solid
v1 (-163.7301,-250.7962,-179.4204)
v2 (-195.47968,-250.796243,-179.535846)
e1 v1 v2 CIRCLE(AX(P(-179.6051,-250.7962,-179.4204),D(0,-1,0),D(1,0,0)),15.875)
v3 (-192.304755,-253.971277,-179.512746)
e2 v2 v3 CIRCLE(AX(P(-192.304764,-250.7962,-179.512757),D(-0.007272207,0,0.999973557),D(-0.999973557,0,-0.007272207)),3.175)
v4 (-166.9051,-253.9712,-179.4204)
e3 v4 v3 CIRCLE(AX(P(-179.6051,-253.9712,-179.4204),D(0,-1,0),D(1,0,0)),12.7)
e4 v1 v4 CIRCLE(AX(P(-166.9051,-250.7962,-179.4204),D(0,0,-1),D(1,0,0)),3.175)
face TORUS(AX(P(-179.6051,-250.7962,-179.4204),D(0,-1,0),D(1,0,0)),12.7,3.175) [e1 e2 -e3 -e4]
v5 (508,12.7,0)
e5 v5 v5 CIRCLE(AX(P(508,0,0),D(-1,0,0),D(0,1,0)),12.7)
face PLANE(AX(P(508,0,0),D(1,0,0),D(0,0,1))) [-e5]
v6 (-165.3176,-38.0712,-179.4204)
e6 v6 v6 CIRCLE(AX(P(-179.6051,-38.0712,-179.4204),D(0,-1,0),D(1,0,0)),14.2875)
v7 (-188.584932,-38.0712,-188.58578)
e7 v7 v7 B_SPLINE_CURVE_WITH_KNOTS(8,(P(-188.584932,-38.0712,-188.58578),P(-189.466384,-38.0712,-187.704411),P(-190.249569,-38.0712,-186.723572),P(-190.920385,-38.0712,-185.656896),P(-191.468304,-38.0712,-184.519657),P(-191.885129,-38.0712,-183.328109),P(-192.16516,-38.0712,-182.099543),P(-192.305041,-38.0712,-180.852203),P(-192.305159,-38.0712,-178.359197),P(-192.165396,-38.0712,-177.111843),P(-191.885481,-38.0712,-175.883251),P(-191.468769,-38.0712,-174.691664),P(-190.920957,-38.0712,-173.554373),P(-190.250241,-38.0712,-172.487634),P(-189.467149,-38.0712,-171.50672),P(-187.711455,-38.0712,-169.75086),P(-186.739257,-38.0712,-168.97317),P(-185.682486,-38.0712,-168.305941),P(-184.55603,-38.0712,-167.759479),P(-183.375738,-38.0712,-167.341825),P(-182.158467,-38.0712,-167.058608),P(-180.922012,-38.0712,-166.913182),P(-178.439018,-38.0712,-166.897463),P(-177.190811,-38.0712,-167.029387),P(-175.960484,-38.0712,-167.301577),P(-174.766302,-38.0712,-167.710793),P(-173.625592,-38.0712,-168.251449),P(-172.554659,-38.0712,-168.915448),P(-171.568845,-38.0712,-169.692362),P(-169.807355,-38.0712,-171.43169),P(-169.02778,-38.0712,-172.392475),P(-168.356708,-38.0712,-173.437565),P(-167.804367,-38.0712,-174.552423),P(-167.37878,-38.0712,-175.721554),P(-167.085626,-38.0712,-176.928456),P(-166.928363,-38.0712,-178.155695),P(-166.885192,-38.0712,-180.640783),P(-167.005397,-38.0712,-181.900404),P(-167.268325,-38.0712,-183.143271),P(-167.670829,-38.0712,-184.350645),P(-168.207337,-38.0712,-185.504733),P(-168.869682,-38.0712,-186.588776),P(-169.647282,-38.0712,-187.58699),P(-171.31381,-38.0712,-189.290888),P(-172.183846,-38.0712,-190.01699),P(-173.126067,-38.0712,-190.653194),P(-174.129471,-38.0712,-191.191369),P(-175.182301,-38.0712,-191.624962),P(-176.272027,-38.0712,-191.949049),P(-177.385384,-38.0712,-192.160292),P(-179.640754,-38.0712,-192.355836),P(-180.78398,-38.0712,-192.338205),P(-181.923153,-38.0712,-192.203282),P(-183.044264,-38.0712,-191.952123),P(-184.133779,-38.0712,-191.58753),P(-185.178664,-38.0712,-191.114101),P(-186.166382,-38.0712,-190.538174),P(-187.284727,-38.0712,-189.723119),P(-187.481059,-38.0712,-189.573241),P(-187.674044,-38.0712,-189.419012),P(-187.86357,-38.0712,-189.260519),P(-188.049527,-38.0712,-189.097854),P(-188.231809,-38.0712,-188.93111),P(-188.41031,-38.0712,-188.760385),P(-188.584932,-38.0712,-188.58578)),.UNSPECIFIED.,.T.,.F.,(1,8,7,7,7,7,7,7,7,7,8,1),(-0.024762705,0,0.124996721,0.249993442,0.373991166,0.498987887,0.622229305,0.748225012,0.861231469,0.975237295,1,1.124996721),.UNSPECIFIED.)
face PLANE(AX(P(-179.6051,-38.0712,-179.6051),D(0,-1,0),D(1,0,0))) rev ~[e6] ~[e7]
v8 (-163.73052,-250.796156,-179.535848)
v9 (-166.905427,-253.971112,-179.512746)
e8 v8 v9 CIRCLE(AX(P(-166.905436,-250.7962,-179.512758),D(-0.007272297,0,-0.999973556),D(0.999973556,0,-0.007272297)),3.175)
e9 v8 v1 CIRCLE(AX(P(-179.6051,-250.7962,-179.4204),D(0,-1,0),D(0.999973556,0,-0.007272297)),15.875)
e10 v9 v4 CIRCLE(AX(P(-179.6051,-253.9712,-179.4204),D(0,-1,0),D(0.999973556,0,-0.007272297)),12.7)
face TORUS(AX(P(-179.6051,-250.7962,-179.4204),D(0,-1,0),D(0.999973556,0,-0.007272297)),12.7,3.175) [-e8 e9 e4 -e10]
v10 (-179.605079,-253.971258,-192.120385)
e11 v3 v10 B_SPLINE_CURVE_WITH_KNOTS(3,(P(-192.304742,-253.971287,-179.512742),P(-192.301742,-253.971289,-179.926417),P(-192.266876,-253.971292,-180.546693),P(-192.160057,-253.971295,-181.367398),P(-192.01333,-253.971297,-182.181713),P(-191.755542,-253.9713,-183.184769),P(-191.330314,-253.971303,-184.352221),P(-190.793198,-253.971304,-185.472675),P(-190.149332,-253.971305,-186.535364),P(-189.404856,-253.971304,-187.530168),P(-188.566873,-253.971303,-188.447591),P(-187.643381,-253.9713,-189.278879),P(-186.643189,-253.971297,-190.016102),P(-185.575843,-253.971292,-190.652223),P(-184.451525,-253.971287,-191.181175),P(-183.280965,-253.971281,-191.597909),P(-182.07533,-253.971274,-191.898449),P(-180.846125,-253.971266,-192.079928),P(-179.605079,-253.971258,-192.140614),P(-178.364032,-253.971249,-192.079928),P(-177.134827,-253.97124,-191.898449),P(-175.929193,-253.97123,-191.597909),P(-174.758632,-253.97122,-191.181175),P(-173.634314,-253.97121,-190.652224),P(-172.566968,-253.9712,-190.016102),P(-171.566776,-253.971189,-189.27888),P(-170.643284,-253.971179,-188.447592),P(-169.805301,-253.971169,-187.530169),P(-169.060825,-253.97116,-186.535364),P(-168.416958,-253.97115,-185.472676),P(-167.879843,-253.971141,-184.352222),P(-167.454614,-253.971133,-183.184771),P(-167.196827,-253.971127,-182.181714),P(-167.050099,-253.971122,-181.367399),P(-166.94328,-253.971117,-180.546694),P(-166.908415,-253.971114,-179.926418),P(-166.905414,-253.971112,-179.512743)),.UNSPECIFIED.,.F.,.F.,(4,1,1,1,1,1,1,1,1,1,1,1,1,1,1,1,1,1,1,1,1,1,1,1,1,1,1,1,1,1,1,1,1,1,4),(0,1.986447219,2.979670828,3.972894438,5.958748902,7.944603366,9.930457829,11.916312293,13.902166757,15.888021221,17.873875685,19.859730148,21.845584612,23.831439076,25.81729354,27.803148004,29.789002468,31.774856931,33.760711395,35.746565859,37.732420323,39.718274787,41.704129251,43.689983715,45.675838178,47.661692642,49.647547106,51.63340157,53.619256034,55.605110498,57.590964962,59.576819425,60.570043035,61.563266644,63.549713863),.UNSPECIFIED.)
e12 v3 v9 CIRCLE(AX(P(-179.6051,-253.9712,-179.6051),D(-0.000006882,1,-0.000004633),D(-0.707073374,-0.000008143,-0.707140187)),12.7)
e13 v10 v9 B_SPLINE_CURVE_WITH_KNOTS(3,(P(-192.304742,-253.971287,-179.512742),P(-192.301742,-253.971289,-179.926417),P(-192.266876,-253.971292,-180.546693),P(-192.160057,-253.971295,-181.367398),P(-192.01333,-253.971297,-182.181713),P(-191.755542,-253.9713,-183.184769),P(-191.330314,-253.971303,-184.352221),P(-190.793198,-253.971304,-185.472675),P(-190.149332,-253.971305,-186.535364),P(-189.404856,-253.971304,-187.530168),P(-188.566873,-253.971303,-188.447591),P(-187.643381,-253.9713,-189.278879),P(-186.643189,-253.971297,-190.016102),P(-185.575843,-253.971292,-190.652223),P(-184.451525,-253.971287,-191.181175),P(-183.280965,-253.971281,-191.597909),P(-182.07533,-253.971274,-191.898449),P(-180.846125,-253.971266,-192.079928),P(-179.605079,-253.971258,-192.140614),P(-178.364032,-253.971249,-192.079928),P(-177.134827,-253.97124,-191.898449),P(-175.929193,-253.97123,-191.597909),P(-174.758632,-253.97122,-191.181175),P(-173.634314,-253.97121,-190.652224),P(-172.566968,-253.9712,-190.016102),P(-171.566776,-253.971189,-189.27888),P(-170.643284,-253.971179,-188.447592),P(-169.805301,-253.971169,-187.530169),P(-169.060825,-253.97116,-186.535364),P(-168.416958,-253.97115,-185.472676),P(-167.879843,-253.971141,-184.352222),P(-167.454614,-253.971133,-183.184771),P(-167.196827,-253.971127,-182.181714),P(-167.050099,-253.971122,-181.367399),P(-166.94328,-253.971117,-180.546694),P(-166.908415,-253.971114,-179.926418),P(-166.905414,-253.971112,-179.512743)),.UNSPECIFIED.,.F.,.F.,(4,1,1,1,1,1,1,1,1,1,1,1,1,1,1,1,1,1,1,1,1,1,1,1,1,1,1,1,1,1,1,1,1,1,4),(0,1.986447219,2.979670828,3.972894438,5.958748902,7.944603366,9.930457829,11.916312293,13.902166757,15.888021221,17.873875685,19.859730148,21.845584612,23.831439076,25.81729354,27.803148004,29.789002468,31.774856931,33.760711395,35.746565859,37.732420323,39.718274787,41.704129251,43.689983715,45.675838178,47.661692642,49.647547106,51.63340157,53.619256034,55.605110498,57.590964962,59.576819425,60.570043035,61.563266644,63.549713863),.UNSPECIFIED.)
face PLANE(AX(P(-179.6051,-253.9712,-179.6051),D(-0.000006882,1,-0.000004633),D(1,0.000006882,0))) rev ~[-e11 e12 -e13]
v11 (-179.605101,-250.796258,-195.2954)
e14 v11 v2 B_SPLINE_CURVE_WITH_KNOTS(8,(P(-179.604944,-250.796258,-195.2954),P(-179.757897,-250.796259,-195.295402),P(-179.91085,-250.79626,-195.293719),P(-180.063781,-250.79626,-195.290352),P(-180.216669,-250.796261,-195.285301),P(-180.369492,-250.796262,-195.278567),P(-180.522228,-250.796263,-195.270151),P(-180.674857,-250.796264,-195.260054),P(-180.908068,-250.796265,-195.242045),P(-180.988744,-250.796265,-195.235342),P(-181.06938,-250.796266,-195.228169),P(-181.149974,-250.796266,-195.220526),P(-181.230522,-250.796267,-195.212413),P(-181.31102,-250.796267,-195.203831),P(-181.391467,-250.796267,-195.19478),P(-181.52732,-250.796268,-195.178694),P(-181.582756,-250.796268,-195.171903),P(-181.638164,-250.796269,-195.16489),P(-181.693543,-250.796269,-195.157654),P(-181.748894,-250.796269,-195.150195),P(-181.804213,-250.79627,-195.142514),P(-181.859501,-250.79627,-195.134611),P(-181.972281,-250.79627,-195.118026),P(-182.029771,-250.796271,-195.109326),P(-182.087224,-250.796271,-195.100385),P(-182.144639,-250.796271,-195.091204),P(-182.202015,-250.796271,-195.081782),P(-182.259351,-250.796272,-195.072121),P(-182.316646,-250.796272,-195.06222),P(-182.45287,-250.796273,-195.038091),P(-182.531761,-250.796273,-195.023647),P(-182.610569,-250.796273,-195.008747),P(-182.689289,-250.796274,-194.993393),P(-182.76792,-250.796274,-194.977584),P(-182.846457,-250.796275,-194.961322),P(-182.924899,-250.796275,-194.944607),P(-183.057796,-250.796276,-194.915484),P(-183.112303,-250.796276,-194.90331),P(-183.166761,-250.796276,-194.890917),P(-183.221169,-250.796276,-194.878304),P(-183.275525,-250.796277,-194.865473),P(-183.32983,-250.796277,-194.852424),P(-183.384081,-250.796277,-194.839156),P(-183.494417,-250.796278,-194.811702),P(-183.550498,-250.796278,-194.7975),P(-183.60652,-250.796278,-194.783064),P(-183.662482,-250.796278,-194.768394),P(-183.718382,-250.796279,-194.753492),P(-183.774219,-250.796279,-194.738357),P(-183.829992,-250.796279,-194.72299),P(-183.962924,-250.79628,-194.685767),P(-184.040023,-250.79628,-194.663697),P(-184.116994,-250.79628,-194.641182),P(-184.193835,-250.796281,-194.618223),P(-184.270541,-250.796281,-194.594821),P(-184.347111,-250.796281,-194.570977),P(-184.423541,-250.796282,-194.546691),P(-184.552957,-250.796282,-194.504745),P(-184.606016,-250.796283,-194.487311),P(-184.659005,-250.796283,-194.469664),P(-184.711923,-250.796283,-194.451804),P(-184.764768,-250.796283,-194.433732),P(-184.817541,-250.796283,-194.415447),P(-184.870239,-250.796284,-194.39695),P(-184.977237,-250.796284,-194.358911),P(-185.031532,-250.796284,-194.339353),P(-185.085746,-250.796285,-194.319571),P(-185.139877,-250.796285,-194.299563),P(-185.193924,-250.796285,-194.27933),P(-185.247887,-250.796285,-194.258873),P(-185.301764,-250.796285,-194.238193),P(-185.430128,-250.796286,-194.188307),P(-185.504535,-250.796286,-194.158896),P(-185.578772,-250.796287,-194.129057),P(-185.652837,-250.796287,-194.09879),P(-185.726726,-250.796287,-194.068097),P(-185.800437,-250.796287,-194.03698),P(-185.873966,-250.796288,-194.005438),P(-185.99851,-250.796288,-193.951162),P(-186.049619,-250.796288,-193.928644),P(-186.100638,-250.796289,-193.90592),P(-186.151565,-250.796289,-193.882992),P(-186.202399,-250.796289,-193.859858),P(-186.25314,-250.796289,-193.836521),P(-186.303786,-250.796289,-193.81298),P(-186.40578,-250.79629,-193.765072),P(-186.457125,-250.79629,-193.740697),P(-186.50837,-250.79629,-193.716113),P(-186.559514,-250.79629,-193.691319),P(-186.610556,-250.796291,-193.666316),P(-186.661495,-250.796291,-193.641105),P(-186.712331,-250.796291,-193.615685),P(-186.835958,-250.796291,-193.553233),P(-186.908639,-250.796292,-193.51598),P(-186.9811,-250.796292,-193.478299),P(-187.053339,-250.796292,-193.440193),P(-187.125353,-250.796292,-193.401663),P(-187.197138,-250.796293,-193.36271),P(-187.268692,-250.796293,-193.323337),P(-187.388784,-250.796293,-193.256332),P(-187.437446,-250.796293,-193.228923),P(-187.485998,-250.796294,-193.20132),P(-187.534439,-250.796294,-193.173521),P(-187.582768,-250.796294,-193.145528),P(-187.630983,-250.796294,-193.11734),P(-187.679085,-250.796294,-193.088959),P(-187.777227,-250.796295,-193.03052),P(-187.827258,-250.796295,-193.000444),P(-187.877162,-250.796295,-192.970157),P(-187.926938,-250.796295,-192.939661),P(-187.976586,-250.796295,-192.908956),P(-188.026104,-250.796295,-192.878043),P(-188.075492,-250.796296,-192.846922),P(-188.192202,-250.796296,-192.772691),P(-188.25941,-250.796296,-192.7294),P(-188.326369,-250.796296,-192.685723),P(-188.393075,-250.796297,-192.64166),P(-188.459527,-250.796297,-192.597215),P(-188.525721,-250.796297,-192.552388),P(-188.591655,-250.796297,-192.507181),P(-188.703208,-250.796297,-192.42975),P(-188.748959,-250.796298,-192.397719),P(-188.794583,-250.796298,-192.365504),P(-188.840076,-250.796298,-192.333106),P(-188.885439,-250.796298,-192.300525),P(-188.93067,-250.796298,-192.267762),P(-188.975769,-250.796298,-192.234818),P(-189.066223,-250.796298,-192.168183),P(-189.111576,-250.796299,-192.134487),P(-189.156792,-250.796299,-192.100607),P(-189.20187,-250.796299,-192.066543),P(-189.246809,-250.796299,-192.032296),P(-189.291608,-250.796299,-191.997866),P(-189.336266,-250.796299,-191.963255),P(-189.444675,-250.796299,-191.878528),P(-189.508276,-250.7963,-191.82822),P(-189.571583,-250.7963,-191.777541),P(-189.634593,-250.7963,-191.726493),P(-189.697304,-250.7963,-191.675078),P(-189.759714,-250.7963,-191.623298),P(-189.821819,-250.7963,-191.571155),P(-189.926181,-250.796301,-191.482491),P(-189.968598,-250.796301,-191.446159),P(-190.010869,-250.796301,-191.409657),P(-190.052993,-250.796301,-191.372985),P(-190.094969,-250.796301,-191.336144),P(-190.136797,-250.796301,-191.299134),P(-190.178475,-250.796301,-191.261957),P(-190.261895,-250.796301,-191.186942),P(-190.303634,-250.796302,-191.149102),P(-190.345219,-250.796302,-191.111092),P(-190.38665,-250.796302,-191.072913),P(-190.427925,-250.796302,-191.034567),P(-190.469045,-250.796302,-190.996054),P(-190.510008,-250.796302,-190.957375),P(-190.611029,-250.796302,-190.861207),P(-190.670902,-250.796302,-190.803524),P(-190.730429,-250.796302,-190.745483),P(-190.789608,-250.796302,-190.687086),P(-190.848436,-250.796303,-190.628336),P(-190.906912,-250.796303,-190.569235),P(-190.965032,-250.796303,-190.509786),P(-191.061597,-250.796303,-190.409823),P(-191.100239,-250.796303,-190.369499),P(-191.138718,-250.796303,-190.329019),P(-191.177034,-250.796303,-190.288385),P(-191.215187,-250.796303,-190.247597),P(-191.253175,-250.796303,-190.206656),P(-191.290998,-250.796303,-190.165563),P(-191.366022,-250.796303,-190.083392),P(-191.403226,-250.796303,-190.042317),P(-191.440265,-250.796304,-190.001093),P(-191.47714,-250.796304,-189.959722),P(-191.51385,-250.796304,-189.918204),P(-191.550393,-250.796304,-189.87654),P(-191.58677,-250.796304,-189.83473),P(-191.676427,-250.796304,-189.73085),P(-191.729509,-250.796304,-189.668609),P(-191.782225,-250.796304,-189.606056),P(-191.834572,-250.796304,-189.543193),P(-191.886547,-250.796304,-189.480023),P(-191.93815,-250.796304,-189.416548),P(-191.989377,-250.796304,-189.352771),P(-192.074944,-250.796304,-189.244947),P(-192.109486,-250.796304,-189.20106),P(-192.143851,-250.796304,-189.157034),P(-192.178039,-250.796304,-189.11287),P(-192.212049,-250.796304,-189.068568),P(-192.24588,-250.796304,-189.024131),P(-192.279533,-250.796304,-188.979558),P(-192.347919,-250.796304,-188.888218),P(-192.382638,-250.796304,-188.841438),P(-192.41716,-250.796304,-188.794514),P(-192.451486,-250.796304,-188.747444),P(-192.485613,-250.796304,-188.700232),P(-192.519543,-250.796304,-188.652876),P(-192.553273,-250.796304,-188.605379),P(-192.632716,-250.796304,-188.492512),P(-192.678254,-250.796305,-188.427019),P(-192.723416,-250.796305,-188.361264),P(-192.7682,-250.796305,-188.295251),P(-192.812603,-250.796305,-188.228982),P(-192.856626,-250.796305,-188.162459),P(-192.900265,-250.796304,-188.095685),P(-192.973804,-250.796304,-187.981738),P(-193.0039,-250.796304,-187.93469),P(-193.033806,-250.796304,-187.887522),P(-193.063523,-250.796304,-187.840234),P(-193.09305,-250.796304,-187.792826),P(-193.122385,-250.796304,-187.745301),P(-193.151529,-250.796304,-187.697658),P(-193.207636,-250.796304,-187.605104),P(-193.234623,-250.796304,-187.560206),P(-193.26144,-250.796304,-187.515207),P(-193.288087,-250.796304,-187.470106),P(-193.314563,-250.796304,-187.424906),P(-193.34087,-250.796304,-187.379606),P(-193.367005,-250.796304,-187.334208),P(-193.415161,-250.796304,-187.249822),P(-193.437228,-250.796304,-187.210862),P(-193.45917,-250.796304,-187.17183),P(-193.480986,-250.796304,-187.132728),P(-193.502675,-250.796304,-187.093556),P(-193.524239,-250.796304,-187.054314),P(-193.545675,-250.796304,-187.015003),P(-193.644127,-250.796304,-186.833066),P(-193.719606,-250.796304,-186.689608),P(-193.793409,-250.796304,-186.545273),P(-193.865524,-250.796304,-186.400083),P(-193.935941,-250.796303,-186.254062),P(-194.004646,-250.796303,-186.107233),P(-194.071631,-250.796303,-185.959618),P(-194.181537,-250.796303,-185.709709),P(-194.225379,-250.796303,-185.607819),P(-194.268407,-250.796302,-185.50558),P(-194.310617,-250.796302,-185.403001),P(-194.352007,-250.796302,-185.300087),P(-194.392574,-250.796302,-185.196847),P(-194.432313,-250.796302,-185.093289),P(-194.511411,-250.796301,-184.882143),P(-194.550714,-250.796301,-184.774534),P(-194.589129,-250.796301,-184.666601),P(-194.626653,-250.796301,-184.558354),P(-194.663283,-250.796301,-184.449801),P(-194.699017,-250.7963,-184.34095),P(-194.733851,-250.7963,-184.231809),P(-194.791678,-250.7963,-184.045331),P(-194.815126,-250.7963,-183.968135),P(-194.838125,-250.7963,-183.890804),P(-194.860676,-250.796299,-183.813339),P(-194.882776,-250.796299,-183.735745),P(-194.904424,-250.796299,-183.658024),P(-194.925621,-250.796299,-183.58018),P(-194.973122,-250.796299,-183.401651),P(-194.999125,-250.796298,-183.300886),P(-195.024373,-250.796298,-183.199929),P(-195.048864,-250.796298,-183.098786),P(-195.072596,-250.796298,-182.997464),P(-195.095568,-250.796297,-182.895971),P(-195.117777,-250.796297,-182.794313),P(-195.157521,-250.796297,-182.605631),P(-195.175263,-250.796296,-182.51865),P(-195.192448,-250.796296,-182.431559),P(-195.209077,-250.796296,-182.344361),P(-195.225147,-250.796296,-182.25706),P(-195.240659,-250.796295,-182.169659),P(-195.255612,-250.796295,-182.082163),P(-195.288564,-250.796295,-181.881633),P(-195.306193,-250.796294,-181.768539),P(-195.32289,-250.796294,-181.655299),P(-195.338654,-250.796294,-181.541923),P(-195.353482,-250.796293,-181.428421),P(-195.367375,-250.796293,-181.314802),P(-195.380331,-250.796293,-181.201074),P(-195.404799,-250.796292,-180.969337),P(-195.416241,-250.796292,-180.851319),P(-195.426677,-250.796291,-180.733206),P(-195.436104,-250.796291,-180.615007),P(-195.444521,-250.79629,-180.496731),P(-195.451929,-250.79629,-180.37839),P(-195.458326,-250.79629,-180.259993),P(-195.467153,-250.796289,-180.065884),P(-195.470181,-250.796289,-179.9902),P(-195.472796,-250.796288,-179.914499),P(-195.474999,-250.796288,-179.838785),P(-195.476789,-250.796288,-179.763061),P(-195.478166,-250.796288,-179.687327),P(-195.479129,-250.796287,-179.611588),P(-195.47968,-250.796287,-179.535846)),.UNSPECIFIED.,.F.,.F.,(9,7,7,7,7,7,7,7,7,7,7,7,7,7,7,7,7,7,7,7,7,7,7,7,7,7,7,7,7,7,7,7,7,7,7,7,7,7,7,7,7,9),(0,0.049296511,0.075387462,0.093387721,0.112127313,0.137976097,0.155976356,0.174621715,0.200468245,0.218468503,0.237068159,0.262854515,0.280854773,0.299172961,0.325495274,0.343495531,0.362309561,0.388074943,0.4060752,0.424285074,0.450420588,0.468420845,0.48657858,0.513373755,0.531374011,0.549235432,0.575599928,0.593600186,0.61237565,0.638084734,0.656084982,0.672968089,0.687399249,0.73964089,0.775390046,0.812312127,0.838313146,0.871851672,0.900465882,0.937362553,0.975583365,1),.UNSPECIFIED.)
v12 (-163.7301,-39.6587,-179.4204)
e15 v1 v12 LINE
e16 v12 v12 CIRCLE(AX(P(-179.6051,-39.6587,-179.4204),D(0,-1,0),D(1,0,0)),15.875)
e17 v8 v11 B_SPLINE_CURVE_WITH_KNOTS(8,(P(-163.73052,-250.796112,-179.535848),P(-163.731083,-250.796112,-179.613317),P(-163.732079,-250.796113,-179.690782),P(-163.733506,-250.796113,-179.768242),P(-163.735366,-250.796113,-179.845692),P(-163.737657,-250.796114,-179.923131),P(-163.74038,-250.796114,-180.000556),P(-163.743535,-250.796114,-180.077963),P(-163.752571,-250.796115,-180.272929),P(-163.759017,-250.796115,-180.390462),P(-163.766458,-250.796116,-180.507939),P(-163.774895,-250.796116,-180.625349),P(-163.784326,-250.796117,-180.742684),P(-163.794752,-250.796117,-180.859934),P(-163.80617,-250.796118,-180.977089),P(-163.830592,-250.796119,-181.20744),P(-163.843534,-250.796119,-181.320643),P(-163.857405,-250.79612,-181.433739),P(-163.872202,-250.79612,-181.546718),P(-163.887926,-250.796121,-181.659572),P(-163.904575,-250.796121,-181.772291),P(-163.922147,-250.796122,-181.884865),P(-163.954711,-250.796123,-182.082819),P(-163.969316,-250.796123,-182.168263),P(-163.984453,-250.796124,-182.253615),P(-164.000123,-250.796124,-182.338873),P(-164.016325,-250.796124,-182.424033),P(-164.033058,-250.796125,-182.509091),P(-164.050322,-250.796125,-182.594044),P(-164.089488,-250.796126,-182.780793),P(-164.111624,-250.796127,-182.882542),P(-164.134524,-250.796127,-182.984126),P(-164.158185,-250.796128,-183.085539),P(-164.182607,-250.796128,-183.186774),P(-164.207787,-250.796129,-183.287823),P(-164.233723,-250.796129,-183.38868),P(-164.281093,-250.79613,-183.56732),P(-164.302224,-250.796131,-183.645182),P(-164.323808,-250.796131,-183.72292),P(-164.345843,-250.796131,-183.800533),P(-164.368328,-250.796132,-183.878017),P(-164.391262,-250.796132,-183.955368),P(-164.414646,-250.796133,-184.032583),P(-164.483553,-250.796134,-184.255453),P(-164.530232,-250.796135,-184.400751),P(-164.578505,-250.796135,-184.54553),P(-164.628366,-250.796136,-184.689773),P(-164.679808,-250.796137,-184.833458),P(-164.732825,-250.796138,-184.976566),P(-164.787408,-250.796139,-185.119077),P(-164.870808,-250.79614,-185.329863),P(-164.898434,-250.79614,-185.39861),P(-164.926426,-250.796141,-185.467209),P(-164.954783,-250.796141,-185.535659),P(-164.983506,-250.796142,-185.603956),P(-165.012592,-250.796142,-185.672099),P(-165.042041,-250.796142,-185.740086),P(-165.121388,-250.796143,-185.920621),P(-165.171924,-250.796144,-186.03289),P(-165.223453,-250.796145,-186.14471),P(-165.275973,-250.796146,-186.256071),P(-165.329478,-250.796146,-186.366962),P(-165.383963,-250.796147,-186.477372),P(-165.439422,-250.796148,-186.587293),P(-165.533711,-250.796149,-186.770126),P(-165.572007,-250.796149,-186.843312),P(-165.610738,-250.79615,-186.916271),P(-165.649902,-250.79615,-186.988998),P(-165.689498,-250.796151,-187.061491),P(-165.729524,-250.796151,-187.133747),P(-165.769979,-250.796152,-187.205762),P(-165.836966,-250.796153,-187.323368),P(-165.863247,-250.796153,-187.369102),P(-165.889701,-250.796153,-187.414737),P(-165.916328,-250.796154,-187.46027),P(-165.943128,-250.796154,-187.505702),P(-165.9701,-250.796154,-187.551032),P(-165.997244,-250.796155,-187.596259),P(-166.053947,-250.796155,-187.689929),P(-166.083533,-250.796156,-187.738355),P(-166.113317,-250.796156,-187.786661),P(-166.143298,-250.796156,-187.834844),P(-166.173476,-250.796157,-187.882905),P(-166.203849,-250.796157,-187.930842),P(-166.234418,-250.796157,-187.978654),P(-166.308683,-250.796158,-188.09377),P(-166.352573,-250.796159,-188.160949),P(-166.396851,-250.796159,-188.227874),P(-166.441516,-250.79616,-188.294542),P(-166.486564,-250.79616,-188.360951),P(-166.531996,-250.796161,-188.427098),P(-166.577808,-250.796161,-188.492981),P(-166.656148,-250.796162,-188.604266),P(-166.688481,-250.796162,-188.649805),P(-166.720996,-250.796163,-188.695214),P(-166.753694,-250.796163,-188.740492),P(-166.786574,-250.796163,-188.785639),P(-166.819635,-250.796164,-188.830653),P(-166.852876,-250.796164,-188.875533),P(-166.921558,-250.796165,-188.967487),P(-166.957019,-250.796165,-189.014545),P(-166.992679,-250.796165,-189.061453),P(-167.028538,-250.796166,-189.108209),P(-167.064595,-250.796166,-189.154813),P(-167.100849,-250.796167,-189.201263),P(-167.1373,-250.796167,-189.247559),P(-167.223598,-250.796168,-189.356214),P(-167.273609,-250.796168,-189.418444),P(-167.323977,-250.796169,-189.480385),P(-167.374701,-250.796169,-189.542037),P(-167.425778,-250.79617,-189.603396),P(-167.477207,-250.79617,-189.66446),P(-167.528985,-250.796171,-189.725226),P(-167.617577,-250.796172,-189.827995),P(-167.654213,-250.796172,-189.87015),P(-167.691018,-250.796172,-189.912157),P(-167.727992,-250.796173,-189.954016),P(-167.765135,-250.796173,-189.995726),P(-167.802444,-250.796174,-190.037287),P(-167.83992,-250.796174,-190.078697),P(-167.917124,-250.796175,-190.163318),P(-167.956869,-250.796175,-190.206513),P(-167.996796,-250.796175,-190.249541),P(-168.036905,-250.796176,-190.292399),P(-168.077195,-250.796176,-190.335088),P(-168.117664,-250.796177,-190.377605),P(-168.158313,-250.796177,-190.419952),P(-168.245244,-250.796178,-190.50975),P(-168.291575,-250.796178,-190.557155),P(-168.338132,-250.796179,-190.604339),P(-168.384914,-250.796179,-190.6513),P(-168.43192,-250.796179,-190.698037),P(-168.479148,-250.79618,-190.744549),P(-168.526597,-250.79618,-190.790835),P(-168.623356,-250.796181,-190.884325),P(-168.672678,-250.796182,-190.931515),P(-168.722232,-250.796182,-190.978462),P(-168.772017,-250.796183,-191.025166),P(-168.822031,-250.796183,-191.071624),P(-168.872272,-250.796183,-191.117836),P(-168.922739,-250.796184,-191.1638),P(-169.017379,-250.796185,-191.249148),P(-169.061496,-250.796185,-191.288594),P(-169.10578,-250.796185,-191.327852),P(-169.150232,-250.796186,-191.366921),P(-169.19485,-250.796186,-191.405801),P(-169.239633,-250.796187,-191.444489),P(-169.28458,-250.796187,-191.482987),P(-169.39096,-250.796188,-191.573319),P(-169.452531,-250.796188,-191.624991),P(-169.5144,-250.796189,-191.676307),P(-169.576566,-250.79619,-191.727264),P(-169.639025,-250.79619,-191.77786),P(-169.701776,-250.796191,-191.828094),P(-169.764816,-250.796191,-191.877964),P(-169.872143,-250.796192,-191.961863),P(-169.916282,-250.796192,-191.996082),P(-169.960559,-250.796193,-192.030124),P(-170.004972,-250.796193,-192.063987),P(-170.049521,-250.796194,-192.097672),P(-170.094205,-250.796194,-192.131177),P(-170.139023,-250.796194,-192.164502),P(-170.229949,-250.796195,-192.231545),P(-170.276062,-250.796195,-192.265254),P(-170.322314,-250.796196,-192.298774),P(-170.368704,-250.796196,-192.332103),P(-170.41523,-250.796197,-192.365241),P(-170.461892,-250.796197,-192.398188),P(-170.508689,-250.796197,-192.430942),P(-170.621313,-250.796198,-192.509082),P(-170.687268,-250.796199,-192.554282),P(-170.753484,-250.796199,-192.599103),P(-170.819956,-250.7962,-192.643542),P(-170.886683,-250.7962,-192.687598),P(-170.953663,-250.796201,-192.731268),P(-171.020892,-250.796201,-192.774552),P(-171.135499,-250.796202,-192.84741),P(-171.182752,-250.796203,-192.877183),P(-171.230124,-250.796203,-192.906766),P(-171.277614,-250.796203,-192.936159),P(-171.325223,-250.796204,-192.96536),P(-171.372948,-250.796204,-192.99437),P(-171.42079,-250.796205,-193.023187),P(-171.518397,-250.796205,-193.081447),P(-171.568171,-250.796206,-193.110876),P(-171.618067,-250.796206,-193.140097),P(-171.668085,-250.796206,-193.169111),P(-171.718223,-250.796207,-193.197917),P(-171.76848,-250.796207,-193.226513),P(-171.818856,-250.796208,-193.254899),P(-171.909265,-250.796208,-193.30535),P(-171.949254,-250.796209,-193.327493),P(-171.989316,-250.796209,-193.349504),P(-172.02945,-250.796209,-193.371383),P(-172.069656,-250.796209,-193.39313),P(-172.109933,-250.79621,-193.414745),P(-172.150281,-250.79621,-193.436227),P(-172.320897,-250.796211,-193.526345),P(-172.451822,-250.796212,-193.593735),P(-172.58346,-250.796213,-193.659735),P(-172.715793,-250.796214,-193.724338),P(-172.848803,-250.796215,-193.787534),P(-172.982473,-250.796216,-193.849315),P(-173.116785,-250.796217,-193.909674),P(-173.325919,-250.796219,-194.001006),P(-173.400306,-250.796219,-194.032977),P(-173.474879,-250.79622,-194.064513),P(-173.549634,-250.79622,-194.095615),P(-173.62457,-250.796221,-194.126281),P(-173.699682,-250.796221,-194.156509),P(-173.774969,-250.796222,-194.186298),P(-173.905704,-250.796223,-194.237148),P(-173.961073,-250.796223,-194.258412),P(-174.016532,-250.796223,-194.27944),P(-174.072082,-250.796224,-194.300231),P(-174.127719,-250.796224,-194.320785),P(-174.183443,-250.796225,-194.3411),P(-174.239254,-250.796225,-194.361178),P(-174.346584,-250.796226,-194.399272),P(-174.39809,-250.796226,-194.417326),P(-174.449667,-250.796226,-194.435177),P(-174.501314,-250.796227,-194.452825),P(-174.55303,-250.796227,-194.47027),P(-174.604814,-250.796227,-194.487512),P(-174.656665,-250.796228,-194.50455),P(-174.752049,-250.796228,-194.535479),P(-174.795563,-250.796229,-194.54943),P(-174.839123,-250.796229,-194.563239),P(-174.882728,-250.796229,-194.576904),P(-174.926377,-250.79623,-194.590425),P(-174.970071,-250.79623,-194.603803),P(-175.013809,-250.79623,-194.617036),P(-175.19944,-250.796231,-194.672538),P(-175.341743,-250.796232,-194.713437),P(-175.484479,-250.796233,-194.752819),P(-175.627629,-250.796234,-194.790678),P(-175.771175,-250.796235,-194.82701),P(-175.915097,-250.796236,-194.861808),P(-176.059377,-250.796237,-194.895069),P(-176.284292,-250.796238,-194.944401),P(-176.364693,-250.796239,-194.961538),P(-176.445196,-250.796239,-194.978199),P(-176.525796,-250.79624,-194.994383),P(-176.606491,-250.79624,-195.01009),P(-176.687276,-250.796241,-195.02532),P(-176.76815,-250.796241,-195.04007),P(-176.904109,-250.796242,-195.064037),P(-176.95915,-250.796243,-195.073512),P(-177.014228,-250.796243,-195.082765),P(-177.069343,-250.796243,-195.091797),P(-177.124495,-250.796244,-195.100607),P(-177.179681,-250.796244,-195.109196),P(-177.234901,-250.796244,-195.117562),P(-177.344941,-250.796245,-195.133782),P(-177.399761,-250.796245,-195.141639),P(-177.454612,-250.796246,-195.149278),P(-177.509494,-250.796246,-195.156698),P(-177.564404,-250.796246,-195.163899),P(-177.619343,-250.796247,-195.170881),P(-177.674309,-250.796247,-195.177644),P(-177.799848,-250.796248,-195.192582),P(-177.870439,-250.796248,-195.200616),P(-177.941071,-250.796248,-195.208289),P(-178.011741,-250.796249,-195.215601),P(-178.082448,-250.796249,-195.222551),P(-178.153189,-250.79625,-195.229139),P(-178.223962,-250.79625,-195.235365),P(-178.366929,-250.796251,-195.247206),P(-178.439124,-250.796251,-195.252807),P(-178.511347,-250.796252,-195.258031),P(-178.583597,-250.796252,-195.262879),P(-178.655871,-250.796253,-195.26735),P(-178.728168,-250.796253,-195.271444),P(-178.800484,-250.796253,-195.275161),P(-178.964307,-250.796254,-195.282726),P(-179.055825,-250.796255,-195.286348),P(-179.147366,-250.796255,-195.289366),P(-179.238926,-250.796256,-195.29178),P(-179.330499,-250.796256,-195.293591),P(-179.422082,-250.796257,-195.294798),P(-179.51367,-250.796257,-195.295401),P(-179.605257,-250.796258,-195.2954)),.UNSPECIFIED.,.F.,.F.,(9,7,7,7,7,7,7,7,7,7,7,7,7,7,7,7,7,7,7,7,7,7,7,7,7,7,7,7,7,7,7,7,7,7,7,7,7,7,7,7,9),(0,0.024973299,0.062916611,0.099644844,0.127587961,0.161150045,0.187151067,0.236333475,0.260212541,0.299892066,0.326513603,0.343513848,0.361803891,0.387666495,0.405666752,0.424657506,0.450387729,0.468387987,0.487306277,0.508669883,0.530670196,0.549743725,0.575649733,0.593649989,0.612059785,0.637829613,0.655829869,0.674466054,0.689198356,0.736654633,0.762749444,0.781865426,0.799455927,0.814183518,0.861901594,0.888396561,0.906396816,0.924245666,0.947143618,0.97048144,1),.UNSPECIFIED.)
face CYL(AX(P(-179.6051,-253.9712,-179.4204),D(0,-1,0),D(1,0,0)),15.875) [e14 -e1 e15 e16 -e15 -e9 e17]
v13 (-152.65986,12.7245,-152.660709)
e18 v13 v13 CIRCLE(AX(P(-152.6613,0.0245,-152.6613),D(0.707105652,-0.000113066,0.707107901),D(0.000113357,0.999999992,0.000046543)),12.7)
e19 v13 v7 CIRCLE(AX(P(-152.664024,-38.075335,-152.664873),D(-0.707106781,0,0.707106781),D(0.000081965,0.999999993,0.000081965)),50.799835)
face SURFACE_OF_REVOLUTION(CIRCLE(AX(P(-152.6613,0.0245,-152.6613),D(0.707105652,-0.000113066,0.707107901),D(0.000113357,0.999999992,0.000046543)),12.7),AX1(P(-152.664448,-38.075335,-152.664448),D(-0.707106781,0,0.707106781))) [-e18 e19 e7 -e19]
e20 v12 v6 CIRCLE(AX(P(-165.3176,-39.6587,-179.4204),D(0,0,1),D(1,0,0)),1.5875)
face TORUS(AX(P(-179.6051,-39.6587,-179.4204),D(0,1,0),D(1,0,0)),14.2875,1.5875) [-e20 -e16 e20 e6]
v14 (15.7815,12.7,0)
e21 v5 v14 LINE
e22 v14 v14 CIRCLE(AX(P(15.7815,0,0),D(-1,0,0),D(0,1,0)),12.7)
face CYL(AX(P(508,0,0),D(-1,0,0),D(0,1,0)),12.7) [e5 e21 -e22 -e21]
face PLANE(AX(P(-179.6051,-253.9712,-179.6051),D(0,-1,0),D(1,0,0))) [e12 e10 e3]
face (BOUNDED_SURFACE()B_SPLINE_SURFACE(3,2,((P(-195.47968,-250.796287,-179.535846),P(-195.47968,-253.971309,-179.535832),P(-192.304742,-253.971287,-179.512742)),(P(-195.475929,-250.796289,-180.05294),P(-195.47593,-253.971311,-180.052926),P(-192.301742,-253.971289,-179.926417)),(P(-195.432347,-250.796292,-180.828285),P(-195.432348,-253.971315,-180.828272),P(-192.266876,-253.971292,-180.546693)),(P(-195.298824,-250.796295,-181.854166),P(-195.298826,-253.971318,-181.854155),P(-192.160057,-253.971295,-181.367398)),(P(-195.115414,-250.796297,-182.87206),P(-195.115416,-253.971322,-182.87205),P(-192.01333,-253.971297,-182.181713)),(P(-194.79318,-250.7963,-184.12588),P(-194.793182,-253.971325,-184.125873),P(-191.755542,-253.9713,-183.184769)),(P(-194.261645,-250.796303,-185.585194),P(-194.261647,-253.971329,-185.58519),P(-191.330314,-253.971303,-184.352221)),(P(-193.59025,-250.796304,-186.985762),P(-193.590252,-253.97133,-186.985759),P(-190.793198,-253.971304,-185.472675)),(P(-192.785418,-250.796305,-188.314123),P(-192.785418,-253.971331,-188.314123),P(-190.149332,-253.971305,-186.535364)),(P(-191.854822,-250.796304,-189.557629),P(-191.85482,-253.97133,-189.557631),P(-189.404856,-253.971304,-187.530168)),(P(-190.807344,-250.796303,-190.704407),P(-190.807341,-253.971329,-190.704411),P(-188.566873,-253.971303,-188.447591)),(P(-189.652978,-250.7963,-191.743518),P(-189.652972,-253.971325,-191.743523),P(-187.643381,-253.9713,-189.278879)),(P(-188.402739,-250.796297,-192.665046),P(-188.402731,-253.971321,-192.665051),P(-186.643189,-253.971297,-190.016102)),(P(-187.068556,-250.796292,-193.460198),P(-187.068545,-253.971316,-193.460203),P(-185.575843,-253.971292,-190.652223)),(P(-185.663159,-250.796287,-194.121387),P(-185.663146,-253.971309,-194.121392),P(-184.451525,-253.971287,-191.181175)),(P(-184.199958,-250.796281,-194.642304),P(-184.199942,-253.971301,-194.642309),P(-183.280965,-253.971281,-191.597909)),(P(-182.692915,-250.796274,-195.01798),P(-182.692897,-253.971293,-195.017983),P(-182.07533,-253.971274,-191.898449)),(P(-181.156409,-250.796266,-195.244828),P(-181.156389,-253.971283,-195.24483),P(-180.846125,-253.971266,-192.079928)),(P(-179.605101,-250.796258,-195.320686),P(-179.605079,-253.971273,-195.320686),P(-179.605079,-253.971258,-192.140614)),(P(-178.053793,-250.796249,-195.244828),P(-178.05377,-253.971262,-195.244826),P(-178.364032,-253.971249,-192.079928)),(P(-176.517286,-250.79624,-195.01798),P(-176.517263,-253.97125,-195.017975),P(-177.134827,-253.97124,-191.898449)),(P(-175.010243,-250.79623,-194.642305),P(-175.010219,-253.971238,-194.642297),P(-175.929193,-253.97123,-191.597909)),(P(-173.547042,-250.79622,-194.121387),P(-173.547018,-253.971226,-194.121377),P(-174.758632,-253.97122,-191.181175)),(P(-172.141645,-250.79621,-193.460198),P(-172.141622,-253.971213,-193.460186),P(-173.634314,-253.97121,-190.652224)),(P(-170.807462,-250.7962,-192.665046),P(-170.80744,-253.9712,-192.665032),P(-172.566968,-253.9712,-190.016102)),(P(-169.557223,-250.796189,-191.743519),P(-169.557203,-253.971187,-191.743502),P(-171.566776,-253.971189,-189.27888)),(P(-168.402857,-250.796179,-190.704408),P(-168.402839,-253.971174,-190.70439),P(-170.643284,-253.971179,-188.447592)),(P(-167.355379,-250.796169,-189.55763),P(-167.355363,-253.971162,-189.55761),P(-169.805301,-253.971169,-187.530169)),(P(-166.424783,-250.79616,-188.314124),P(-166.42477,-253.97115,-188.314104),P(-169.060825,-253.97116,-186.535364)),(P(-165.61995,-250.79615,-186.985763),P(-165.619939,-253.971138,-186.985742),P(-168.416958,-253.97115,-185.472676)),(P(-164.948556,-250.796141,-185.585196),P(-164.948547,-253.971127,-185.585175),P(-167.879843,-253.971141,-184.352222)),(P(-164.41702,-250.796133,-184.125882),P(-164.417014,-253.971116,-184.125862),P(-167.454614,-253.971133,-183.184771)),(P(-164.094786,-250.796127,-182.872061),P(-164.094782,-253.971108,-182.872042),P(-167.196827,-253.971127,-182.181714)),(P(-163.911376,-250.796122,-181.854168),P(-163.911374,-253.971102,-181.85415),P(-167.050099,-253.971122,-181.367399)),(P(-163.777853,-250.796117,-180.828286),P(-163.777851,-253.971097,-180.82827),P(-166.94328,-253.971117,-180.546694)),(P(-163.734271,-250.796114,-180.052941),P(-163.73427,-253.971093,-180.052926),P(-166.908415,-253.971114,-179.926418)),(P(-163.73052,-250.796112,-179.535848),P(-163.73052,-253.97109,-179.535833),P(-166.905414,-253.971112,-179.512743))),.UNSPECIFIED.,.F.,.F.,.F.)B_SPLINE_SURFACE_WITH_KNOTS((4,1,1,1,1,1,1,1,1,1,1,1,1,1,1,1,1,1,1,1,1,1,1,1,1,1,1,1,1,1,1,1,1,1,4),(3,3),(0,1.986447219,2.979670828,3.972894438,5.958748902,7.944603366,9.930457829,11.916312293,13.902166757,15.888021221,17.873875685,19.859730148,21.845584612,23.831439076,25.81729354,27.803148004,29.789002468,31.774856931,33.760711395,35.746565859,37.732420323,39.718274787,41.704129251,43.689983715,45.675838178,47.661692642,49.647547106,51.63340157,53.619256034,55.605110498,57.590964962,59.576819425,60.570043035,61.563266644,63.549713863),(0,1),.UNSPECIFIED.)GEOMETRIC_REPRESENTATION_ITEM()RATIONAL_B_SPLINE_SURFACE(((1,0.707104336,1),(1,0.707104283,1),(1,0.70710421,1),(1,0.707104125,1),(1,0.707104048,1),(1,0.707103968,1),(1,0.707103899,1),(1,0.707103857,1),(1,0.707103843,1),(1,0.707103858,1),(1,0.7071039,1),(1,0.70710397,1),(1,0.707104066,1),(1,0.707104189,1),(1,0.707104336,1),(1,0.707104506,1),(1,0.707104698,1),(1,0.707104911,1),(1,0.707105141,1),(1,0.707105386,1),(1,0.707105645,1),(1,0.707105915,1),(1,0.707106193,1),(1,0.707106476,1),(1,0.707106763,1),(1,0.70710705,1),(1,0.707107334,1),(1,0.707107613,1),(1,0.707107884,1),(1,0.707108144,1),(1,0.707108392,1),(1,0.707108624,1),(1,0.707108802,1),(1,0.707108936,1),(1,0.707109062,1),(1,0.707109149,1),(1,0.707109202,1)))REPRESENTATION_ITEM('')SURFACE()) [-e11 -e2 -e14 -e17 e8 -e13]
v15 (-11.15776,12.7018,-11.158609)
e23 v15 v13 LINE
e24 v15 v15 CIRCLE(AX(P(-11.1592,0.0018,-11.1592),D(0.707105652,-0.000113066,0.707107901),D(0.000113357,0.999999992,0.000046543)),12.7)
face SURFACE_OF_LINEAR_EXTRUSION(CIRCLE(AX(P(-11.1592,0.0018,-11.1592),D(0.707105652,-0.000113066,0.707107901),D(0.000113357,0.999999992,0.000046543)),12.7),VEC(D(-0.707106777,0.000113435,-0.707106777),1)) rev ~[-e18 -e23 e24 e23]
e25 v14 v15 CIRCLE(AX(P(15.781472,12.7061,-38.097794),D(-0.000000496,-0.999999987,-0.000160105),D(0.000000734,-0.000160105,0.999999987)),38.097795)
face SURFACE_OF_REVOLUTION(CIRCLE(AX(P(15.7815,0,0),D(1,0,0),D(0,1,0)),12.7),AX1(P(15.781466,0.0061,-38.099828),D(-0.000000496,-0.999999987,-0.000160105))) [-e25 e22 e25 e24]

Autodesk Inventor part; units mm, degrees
ref_plane "XZ Plane" through (0, 0, 0) normal (0, 1, 0) x (-1, 0, 0)
ref_plane "XY Plane" through (0, 0, 0) normal (0, 0, 1) x (1, 0, 0)
ref_plane "Work Plane1" through (508, 0, 0) normal (1, 0, 0) x (0, 1, 0)
sketch "Sketch13" plane through (508, 0, 0) normal (1, 0, 0) x (0, 1, 0)
  circle A0 centre (0, 0) radius 12.7
  point P0 (0, 0)
  dimension "d79" = 25.4
sketch3d "3D Sketch1"
  line L0 (508, 0, 0) -> (15.7815, 0, 0)
  arc A0 (15.7815, 0, 0) -> (-11.1592, 0.0018, -11.1592) centre (15.7815, 0.0061, -38.1) ccw
  line L1 (-11.1592, 0.0018, -11.1592) -> (-152.6613, 0.0245, -152.6613)
  arc A1 (-152.6613, 0.0245, -152.6613) -> (-179.6051, -38.0755, -179.6051) centre (-152.6644, -38.0755, -152.6644) ccw
  line L2 (-179.6051, -38.0755, -179.6051) -> (-179.6051, -253.9712, -179.6051)
  dimension "d73" = 508
  dimension "d74" = 135
  dimension "d75" = 254
  dimension "d76" = 254
  dimension "d77" = 38.1
  dimension "d78" = 38.1
sweep "Sweep1" add profiles "Sketch13" path "3D Sketch1"
sketch "Sketch14" plane through (-179.6051, -253.9712, -179.6051) normal (0, -1, 0) x (1, 0, 0)
  circle A0 centre (0, 0.1847) radius 15.875
  point P0 (179.6051, 179.6051)
  dimension "d82" = 31.75
extrude "Extrusion1" add sketch "Sketch14" against normal blind 215.9
fillet "Fillet1" radius 3.175 1 edges at (-195.4801, -253.9712, -179.4205)
fillet "Fillet2" radius 1.5875 1 edges at (-195.4801, -38.0712, -179.4205)
equation "\"d78\" = d77"
equation "\"BendRadius\" = Thickness"
equation "\"BendReliefWidth\" = Thickness"
equation "\"BendReliefDepth\" = 0.5 * Thickness"
equation "\"CornerReliefSize\" = 4 * Thickness"
equation "\"MinimumRemnant\" = 2 * Thickness"
equation "\"TransitionRadius\" = BendRadius"
equation "\"JacobiRadiusSize\" = BendRadius"
equation "\"GapSize\" = Thickness"
equation "\"Thickness\" = 9.525"
properties part number "5th Wheel Hitch Part 4"
